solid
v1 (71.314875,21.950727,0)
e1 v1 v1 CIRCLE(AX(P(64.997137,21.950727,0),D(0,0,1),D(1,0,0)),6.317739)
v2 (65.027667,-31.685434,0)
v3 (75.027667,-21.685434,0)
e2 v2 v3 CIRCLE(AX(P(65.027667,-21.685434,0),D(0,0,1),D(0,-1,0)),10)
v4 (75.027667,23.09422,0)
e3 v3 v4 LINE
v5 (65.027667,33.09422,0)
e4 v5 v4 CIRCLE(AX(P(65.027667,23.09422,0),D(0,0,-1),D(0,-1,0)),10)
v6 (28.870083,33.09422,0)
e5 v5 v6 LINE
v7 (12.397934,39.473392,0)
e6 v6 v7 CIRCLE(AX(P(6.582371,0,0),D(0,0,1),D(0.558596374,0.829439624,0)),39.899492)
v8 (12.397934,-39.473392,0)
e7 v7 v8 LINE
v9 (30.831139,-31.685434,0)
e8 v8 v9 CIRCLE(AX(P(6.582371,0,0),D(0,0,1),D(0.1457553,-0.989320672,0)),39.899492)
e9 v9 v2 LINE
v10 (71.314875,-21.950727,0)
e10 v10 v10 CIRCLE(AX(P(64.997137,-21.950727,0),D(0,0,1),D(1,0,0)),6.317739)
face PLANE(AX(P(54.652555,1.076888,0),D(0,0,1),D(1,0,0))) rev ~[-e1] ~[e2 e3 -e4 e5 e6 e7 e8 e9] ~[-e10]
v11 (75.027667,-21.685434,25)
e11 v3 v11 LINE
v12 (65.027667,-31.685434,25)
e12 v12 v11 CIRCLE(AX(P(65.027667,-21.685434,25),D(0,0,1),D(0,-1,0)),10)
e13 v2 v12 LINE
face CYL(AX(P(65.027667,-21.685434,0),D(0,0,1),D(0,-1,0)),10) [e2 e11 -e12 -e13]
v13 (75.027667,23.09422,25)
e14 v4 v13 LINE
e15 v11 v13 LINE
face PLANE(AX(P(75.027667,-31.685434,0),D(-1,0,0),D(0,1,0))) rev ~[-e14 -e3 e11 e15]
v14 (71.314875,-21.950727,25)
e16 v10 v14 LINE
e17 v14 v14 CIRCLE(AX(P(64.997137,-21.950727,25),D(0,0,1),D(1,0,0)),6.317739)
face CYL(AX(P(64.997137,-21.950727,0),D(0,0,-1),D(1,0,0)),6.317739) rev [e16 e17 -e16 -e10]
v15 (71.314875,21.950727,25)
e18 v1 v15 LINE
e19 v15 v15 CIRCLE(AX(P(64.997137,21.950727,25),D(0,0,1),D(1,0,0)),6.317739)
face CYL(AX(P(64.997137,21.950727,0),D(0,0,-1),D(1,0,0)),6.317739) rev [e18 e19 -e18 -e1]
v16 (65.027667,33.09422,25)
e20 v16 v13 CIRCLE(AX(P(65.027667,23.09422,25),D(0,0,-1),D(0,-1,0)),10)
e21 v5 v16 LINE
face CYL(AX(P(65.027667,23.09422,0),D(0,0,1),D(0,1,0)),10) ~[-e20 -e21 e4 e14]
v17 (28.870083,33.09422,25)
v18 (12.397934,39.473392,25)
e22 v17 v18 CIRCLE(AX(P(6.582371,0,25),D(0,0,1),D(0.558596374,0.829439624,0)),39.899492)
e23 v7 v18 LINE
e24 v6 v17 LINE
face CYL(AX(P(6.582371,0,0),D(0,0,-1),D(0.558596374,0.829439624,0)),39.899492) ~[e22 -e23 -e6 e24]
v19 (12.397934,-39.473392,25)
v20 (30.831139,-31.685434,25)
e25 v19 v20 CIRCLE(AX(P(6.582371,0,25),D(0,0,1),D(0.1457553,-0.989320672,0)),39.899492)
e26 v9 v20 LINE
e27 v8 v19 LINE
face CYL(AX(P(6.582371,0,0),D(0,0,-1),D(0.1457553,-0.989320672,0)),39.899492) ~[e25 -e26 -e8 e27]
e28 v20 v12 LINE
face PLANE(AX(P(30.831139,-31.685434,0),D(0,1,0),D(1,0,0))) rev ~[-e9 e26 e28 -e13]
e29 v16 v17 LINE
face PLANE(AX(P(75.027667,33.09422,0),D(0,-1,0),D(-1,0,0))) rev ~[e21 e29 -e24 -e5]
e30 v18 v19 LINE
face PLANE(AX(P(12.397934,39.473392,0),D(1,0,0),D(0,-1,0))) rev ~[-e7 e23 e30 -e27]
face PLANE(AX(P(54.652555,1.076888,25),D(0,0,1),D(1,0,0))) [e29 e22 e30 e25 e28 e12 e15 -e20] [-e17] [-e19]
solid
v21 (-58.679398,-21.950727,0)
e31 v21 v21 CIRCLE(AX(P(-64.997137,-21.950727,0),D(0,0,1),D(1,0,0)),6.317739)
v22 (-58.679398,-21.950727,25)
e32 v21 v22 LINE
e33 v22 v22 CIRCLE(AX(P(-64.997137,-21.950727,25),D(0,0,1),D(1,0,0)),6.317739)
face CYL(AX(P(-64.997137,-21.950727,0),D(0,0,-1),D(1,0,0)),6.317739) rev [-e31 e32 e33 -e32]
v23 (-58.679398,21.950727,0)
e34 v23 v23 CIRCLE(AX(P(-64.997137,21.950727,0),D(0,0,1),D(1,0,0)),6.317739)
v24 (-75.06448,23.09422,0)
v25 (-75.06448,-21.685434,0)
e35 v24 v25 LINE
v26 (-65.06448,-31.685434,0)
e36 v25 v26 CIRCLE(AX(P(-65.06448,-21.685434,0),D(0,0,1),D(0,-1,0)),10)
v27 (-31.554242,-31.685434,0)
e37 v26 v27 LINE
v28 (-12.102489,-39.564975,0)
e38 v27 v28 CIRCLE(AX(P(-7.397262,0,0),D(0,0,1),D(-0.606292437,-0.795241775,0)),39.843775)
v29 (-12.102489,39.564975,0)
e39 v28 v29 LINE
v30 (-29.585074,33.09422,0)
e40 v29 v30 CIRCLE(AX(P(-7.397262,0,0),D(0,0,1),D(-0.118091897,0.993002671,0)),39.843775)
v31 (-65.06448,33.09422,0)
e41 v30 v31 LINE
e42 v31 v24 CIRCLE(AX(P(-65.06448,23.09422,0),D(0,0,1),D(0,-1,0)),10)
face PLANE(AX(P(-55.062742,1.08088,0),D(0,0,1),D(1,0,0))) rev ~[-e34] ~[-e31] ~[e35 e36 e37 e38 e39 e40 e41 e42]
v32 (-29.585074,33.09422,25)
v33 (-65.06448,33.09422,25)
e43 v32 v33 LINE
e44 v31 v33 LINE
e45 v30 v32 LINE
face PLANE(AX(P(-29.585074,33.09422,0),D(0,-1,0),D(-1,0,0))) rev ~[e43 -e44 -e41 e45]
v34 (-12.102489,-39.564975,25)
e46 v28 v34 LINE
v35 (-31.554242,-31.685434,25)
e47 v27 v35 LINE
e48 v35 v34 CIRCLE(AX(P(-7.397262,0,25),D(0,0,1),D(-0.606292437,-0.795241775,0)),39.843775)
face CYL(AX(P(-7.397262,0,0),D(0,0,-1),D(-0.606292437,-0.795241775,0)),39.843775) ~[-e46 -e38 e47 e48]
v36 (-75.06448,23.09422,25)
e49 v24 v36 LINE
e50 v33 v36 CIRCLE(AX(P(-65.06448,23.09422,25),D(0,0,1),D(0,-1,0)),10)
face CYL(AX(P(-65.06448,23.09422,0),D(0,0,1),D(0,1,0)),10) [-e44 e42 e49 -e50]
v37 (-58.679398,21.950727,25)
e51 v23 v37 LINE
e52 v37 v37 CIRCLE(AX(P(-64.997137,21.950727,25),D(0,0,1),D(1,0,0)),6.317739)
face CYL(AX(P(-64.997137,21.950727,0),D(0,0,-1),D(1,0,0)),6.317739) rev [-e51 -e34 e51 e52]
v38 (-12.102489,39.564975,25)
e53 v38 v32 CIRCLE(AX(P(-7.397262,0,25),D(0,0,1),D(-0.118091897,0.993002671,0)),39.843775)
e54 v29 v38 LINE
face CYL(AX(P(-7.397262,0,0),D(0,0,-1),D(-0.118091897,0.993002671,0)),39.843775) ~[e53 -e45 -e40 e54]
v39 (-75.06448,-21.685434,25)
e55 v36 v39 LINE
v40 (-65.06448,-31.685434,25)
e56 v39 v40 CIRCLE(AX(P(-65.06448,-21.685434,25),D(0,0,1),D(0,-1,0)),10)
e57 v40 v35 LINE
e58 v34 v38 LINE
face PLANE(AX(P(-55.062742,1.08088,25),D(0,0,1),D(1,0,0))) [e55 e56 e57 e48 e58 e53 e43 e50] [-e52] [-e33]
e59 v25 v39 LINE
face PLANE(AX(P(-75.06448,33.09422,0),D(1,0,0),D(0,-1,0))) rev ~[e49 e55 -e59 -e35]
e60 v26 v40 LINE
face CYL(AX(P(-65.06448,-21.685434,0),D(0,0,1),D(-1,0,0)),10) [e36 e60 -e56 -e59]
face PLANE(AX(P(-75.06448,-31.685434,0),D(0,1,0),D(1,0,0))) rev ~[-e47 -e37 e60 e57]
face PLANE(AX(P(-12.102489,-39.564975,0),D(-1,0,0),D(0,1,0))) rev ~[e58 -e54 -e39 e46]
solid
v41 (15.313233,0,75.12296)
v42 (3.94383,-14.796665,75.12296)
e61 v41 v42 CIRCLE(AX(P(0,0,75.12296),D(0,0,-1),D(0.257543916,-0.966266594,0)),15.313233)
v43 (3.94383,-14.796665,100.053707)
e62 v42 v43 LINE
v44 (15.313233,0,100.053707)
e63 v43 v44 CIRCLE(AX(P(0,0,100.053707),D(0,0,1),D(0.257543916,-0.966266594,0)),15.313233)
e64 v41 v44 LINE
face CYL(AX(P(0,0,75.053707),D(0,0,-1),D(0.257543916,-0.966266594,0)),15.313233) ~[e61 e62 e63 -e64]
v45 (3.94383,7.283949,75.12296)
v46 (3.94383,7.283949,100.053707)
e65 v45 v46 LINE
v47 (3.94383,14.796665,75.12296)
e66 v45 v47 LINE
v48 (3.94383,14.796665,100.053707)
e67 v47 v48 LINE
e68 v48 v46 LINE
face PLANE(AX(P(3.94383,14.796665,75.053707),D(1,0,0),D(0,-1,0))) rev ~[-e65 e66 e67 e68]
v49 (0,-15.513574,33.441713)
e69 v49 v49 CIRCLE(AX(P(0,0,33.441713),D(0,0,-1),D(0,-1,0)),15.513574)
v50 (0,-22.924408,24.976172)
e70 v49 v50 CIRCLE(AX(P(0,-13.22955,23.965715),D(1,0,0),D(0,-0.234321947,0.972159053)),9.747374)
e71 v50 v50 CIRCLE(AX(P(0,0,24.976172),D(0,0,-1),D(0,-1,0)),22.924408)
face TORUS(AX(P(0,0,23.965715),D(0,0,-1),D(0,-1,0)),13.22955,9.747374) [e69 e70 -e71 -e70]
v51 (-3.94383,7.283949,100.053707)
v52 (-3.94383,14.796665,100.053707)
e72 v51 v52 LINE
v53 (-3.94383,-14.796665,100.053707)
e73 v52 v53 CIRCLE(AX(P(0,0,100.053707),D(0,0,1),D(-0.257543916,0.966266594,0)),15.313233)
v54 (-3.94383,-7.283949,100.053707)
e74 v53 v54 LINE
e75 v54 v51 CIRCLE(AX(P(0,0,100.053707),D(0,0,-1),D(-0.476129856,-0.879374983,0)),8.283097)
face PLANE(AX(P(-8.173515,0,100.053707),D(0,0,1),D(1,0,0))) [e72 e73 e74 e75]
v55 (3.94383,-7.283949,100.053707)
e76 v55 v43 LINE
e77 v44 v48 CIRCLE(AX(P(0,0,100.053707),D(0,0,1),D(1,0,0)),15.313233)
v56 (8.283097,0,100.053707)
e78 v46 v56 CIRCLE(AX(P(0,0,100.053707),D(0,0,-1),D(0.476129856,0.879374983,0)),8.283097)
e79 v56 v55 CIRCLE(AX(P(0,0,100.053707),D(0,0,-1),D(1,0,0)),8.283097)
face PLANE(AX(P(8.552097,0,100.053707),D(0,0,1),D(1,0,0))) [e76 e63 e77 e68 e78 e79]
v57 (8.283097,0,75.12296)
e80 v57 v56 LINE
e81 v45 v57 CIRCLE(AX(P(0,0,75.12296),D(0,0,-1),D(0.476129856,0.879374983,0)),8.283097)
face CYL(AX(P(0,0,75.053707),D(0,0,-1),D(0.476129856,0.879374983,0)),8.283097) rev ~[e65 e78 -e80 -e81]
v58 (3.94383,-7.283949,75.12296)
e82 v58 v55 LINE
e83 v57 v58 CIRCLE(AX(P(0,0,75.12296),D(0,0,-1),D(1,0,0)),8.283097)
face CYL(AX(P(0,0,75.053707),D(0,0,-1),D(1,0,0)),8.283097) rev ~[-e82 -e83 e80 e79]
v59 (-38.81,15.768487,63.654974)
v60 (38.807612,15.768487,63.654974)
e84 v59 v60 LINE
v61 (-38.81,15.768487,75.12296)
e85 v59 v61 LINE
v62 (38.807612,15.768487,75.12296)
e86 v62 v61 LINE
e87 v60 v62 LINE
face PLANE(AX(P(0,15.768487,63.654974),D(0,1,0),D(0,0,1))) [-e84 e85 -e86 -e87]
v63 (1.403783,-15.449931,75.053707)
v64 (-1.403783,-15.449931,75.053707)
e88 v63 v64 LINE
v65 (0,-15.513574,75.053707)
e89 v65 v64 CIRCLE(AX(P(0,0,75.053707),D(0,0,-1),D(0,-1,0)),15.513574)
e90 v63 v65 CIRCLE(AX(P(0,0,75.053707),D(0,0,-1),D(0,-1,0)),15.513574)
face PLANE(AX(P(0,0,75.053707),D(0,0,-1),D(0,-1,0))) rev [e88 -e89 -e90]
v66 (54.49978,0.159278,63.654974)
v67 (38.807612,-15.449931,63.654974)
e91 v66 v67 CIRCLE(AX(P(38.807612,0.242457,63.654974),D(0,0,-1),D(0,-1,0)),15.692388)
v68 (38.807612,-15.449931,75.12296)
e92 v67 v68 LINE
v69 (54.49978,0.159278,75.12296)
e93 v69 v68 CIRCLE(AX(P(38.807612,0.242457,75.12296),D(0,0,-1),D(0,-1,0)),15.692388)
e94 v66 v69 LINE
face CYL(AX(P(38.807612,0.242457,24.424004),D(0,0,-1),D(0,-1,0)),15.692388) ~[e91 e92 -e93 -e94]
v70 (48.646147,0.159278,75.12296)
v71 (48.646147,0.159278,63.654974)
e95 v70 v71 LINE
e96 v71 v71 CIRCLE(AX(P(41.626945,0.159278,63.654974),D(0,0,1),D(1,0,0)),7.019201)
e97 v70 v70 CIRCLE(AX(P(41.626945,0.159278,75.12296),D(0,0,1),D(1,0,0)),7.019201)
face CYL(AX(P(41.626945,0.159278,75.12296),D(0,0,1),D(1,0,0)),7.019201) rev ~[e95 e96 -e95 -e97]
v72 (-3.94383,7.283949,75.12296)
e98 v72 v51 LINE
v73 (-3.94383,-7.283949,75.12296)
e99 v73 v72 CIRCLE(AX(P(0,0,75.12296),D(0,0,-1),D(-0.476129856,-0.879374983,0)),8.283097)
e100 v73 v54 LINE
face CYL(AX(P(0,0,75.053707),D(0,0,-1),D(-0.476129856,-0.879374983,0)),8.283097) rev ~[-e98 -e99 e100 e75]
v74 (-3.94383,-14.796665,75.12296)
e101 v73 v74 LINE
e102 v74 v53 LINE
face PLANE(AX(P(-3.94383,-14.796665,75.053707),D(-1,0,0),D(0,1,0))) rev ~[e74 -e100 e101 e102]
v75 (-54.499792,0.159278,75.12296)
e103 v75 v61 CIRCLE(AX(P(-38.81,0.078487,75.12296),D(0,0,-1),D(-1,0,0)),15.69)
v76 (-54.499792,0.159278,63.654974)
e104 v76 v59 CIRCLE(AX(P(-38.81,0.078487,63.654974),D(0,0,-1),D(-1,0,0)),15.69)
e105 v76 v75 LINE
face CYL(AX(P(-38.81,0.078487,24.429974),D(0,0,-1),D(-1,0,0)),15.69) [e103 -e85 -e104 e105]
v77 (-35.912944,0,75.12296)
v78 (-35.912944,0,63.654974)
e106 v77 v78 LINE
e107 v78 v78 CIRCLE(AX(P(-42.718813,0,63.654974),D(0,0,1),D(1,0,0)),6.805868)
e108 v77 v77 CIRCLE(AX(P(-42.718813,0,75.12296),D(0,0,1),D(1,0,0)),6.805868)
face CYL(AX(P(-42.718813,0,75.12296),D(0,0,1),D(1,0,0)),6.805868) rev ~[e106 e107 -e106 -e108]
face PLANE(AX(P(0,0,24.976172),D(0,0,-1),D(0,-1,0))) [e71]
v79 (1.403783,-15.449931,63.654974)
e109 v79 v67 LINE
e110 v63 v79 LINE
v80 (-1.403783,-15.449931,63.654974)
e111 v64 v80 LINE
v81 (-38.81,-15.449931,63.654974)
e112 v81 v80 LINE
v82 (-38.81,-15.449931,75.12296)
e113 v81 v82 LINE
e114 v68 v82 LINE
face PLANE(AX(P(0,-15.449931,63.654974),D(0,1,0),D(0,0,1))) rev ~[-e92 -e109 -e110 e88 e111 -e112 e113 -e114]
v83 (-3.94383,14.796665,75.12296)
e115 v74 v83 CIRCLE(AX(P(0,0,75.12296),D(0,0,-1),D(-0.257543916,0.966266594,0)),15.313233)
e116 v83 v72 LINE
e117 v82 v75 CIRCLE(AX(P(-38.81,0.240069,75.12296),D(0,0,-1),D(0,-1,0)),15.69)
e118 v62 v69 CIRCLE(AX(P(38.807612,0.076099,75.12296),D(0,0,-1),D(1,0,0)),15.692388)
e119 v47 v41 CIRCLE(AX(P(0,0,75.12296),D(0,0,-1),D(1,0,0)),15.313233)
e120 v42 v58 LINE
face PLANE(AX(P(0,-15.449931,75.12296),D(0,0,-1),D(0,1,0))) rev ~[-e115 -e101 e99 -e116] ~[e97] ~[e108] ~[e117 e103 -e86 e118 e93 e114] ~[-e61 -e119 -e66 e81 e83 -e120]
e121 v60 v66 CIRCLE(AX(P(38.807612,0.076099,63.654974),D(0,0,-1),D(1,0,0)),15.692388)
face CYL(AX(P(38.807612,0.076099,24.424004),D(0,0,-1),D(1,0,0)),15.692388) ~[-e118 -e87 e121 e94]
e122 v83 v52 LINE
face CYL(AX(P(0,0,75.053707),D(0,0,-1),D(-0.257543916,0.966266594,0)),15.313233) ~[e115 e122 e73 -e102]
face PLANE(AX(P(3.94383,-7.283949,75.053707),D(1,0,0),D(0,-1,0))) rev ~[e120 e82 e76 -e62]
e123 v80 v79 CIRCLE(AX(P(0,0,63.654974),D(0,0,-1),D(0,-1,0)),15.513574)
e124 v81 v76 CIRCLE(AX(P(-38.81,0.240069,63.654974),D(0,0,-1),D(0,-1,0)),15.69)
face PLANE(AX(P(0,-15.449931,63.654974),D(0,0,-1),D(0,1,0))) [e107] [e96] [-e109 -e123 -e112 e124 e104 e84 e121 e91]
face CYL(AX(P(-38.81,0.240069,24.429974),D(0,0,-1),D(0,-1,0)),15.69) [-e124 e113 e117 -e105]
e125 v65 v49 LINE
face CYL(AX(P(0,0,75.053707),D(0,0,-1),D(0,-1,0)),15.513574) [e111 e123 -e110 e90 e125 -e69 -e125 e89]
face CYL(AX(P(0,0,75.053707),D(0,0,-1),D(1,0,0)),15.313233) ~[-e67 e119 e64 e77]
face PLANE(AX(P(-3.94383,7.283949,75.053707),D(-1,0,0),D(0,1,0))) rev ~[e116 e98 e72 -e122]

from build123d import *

# Parameters (mm, degrees)
F0_R         = 6.3177385631
F1_DEPTH     = 25
F2_R         = 10
F2_2_R       = 10
F6_DEPTH     = 25
F7_W         = 31.2184179202
F7_H         = 11.4679858088
F8_DEPTH     = 54.5
F9_T1_DEPTH  = 89.929926586
F10_T1_DEPTH = 89.9179858088
F11_R        = 6.8058684083
F11_R_2      = 7.0192014004
F12_DEPTH    = 14.5


# Not quite as in the source:
# - a fillet or chamfer that OpenCascade refuses, or shapes differently, is made with other operations: its cross-section is extruded or revolved along the edge and cut away or added


with BuildPart() as f1:
    # F0 (on Top) → F1 (new body)
    with BuildSketch(Plane.XY):
        with BuildLine():
            Line((-29.585074326, 33.0942198634), (-75.0644803047, 33.0942198634))
            Line((-75.0644803047, 33.0942198634), (-75.0644803047, -31.6854342818))
            Line((-75.0644803047, -31.6854342818), (-31.5542415078, -31.6854342818))
            ThreePointArc((-31.5542415078, -31.6854342818), (-47.222641265, 1.2106089588), (-29.585074326, 33.0942198634))
        make_face()
        with Locations((-64.9971365929, -21.9507273287)):
            Circle(F0_R, mode=Mode.SUBTRACT)
        with Locations((-64.9971365929, 21.9507273287)):
            Circle(F0_R, mode=Mode.SUBTRACT)
        with BuildLine():
            ThreePointArc((-12.1024890528, 39.5649749036), (-21.2275389144, 37.3664266823), (-29.585074326, 33.0942198634))
            Line((-29.585074326, 33.0942198634), (-12.1024890528, 33.0942198634))
            Line((-12.1024890528, 33.0942198634), (-12.1024890528, 39.5649749036))
        make_face()
        with BuildLine():
            Line((-12.1024890528, 33.0942198634), (-29.585074326, 33.0942198634))
            ThreePointArc((-29.585074326, 33.0942198634), (-47.222641265, 1.2106089588), (-31.5542415078, -31.6854342818))
            Line((-31.5542415078, -31.6854342818), (-12.1024890528, -31.6854342818))
            Line((-12.1024890528, -31.6854342818), (-12.1024890528, 33.0942198634))
        make_face()
        with BuildLine():
            Line((-12.1024890528, -31.6854342818), (-31.5542415078, -31.6854342818))
            ThreePointArc((-31.5542415078, -31.6854342818), (-22.3564909939, -36.9289570753), (-12.1024890528, -39.5649749036))
            Line((-12.1024890528, -39.5649749036), (-12.1024890528, -31.6854342818))
        make_face()
    extrude(amount=F1_DEPTH)

    # F2
    f2_edges = [f1.edges().sort_by_distance(p)[0] for p in [
        (-75.06448, 33.09422, 12.5),
        (-75.06448, -31.685434, 12.5),
    ]]
    fillet(f2_edges, radius=F2_R)


with BuildPart() as f1b:
    # F0 (on Top) → F1, piece 2 (new body)
    with BuildSketch(Plane.XY):
        with BuildLine():
            Line((75.027666986, 22.9723975062), (75.027666986, 33.0942198634))
            Line((75.027666986, 33.0942198634), (28.8700831713, 33.0942198634))
            ThreePointArc((28.8700831713, 33.0942198634), (46.4635935741, 1.2073128731), (30.8311391826, -31.6854342818))
            Line((30.8311391826, -31.6854342818), (75.027666986, -31.6854342818))
            Line((75.027666986, -31.6854342818), (75.027666986, -23.3383905143))
            Line((75.027666986, -23.3383905143), (75.027666986, 22.9723975062))
        make_face()
        with Locations((64.9971365929, -21.9507273287)):
            Circle(F0_R, mode=Mode.SUBTRACT)
        with Locations((64.9971365929, 21.9507273287)):
            Circle(F0_R, mode=Mode.SUBTRACT)
        with BuildLine():
            ThreePointArc((30.8311391826, -31.6854342818), (46.4635935741, 1.2073128731), (28.8700831713, 33.0942198634))
            Line((28.8700831713, 33.0942198634), (12.3979339147, 33.0942198634))
            Line((12.3979339147, 33.0942198634), (12.3979339147, -31.6854342818))
            Line((12.3979339147, -31.6854342818), (30.8311391826, -31.6854342818))
        make_face()
        with BuildLine():
            Line((12.3979339147, 33.0942198634), (28.8700831713, 33.0942198634))
            ThreePointArc((28.8700831713, 33.0942198634), (20.991464616, 37.2068208279), (12.3979339147, 39.4733924947))
            Line((12.3979339147, 39.4733924947), (12.3979339147, 33.0942198634))
        make_face()
        with BuildLine():
            ThreePointArc((12.3979339147, -39.4733924947), (22.1107023598, -36.7537810458), (30.8311391826, -31.6854342818))
            Line((30.8311391826, -31.6854342818), (12.3979339147, -31.6854342818))
            Line((12.3979339147, -31.6854342818), (12.3979339147, -39.4733924947))
        make_face()
    extrude(amount=F1_DEPTH)

    # F2#2
    f2_2_edges = [f1b.edges().sort_by_distance(p)[0] for p in [
        (75.027667, 33.09422, 12.5),
        (75.027667, -31.685434, 12.5),
    ]]
    fillet(f2_2_edges, radius=F2_2_R)


with BuildPart() as f4:
    # F3 (on Right) → F4 (revolve)
    with BuildSketch(Plane.YZ):
        with BuildLine():
            Line((-15.5135737732, 24.9761715531), (-15.5135737732, 33.4417130729))
            ThreePointArc((-15.5135737732, 33.4417130729), (-20.5636997877, 30.386116132), (-22.924408385, 24.9761715531))
            Line((-22.924408385, 24.9761715531), (-15.5135737732, 24.9761715531))
        make_face()
        Polygon((0, 24.9761715531), (0, 75.0537067652), (-15.5135737732, 75.0537067652), (-15.5135737732, 33.4417130729), (-15.5135737732, 24.9761715531), align=None)
    revolve(axis=Axis((0, 0, 50.0149391592), (0, 0, -1)))

    # F5 (on face) → F6 (join)
    with BuildSketch(Plane.XY.offset(75.0537067652)):
        with BuildLine():
            ThreePointArc((-3.94382999, -7.2839486676), (-8.2830974389, 0), (-3.94382999, 7.2839486676))
            Line((-3.94382999, 7.2839486676), (-3.94382999, 14.7966654673))
            ThreePointArc((-3.94382999, 14.7966654673), (-15.3132329683, 0), (-3.94382999, -14.7966654673))
            Line((-3.94382999, -14.7966654673), (-3.94382999, -7.2839486676))
        make_face()
        with BuildLine():
            ThreePointArc((3.94382999, 7.2839486676), (7.1160674277, 4.2392555415), (8.2830974389, 0))
            ThreePointArc((8.2830974389, 0), (7.1160674277, -4.2392555415), (3.94382999, -7.2839486676))
            Line((3.94382999, -7.2839486676), (3.94382999, -14.7966654673))
            ThreePointArc((3.94382999, -14.7966654673), (12.1426498625, -9.3301210206), (15.3132329683, 0))
            ThreePointArc((15.3132329683, 0), (12.1426498625, 9.3301210206), (3.94382999, 14.7966654673))
            Line((3.94382999, 14.7966654673), (3.94382999, 7.2839486676))
        make_face()
    extrude(amount=F6_DEPTH)

    # F7 (on Right) → F8 (join, symmetric)
    with BuildSketch(Plane.YZ):
        with Locations((0.1592780463, 69.3889670074)):
            Rectangle(F7_W, F7_H)
    extrude(amount=F8_DEPTH, both=True)

    # F9: fillet of radius 15.6923881554 on 2 edges, made by hand

    # F9_s2 → F9_t1 (cut)
    with BuildSketch(Plane.XY.offset(24.4240037144)):
        with BuildLine():
            ThreePointArc((38.8076118446, -15.4499309137), (49.9038059223, -10.853736836), (54.5, 0.2424572417))
            Line((54.5, 0.2424572417), (54.5, -15.4499309137))
            Line((54.5, -15.4499309137), (38.8076118446, -15.4499309137))
        make_face()
        with BuildLine():
            ThreePointArc((54.5, 0.076098851), (49.9038059223, 11.1722929287), (38.8076118446, 15.7684870064))
            Line((38.8076118446, 15.7684870064), (54.5, 15.7684870064))
            Line((54.5, 15.7684870064), (54.5, 0.076098851))
        make_face()
    extrude(amount=F9_T1_DEPTH, mode=Mode.SUBTRACT)

    # F10: fillet of radius 15.69 on 2 edges, made by hand

    # F10_s2 → F10_t1 (cut)
    with BuildSketch(Plane.XY.offset(24.429974103)):
        with BuildLine():
            ThreePointArc((-38.81, -15.4499309137), (-49.9045053968, -10.8544363106), (-54.5, 0.2400690863))
            Line((-54.5, 0.2400690863), (-54.5, -15.4499309137))
            Line((-54.5, -15.4499309137), (-38.81, -15.4499309137))
        make_face()
        with BuildLine():
            ThreePointArc((-54.5, 0.0784870064), (-49.9045053968, 11.1729924032), (-38.81, 15.7684870064))
            Line((-38.81, 15.7684870064), (-54.5, 15.7684870064))
            Line((-54.5, 15.7684870064), (-54.5, 0.0784870064))
        make_face()
    extrude(amount=F10_T1_DEPTH, mode=Mode.SUBTRACT)

    # F11 (on face) → F12 (cut)
    with BuildSketch(Plane.XY.offset(75.1229599118)):
        with Locations((-42.7188128233, 0)):
            Circle(F11_R)
        with Locations((41.626945138, 0.1592780463)):
            Circle(F11_R_2)
    extrude(amount=-F12_DEPTH, mode=Mode.SUBTRACT)


solid = Compound([f1.part, f1b.part, f4.part])
